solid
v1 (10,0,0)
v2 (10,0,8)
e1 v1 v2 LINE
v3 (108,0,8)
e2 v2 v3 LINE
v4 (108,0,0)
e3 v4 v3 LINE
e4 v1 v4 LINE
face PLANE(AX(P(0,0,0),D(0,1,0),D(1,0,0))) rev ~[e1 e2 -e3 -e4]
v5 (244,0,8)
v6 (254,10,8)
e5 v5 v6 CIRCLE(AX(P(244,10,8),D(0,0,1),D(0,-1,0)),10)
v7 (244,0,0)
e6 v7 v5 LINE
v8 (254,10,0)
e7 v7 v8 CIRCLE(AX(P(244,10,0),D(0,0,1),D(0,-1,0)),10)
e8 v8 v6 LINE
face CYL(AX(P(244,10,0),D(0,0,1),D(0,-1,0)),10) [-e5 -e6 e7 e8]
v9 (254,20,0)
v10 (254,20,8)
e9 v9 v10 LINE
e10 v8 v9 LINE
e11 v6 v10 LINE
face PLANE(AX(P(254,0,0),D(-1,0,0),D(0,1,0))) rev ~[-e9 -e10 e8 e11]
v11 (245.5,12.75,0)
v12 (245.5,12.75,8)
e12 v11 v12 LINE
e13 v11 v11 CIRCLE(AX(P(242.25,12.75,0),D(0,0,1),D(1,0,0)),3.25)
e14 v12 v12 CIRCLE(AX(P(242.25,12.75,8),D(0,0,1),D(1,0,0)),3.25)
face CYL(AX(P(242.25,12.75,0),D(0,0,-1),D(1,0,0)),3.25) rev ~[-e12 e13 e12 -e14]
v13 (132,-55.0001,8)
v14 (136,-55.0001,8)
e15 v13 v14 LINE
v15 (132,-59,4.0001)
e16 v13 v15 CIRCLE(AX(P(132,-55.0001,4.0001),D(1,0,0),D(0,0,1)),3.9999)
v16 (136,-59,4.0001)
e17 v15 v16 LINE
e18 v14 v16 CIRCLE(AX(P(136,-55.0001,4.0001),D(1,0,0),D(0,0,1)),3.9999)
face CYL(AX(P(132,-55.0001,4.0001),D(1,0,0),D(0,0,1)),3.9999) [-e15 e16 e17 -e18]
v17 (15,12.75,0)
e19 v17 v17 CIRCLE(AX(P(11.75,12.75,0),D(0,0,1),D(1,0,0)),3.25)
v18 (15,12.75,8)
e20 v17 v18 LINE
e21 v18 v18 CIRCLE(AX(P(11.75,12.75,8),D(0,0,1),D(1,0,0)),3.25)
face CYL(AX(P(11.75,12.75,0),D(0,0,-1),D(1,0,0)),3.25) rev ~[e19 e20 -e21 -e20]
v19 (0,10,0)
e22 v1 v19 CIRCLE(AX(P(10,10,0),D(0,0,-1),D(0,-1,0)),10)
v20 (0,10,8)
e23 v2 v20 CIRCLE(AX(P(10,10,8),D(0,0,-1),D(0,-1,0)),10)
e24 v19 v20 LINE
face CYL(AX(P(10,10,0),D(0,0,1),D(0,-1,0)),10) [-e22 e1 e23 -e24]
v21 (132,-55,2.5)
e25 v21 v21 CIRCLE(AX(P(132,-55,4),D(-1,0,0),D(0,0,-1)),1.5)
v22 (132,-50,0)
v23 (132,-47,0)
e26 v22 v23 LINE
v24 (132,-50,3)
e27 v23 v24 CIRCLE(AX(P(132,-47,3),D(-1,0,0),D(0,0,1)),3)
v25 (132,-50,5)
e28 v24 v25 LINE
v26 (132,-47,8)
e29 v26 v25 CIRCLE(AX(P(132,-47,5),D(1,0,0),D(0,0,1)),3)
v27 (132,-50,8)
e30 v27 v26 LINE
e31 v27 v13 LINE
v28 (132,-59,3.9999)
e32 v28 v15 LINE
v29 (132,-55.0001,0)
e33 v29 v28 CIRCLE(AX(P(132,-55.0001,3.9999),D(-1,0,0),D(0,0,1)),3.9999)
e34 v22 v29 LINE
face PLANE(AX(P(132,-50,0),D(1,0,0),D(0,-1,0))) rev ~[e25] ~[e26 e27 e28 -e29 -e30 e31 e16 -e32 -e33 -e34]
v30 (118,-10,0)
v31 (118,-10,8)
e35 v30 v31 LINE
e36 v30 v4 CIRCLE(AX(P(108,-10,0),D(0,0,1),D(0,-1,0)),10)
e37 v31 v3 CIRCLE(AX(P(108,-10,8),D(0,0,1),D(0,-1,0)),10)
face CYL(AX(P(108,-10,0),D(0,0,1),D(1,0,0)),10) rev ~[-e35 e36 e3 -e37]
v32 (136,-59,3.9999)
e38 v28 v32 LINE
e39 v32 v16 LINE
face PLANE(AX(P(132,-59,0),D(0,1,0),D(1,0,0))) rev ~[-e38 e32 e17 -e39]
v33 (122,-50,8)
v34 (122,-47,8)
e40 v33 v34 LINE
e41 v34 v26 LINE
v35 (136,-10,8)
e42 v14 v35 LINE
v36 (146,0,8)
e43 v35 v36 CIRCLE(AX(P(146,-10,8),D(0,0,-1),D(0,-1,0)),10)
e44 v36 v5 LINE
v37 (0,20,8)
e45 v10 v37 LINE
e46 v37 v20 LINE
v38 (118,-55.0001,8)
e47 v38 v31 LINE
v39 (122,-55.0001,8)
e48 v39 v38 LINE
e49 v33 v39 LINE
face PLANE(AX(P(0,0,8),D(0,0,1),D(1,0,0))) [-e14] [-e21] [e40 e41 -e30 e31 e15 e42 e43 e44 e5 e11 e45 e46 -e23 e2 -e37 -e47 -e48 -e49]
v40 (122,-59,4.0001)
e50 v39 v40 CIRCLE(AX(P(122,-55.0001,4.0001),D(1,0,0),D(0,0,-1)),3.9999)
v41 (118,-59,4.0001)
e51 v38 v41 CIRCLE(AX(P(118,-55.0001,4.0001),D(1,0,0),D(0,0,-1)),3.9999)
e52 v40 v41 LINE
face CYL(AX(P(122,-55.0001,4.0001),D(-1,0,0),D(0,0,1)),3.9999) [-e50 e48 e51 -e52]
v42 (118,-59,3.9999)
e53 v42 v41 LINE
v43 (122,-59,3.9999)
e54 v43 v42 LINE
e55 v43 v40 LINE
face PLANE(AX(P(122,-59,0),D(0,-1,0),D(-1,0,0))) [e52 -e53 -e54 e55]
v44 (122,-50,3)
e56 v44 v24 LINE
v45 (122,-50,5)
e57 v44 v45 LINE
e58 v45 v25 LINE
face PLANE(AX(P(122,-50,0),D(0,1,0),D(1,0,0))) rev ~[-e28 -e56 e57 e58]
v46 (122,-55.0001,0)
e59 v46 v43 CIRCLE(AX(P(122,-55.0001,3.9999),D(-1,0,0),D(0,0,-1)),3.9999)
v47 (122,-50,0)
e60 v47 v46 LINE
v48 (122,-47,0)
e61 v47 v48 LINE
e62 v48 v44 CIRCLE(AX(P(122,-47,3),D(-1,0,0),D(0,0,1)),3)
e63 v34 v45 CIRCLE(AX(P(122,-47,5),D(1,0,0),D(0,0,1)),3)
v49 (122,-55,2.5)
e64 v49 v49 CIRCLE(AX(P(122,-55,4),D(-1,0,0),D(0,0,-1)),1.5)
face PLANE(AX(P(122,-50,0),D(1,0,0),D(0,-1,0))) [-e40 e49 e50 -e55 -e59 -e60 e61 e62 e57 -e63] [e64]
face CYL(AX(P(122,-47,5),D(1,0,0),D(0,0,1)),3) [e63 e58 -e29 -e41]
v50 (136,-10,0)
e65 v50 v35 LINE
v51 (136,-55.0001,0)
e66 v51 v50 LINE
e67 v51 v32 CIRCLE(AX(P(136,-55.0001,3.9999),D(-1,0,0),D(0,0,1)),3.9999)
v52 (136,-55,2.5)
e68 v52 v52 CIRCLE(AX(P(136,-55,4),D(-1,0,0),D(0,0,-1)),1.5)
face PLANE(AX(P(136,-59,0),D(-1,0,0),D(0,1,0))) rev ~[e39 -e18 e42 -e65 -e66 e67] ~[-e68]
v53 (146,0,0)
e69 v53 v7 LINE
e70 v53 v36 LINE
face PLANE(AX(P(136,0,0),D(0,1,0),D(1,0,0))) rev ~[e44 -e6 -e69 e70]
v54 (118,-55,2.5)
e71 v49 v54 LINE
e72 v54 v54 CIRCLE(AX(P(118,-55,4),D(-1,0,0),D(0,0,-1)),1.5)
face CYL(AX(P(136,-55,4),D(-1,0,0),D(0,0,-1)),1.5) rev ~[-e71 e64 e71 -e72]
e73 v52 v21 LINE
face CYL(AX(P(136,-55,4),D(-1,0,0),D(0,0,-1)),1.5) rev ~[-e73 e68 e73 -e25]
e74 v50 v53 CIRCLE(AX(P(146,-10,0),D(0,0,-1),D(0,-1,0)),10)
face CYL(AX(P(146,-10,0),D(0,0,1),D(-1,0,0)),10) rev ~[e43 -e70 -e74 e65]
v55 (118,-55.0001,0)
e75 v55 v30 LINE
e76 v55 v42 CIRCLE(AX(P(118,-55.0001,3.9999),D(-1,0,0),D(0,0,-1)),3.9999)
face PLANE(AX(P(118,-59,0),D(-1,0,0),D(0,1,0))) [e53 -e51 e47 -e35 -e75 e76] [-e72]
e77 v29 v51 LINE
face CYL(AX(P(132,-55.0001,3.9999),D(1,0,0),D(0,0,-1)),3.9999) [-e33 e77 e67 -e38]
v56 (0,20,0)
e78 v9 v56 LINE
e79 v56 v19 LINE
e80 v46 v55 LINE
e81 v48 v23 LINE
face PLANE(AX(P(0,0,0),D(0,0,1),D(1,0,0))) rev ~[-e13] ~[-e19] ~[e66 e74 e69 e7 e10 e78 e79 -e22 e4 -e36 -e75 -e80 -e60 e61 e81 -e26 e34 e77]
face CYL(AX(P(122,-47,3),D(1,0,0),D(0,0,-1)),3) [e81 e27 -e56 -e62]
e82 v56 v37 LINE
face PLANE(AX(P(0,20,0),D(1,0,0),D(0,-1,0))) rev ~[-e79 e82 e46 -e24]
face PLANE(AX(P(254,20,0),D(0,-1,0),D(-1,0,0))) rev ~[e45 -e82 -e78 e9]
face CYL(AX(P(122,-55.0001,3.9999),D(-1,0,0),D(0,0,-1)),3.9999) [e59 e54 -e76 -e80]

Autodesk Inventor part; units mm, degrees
ref_plane "YZ Plane" through (0, 0, 0) normal (1, 0, 0) x (0, 1, 0)
ref_plane "XZ Plane" through (0, 0, 0) normal (0, 1, 0) x (-1, 0, 0)
ref_plane "XY Plane" through (0, 0, 0) normal (0, 0, 1) x (1, 0, 0)
sketch "Sketch1" plane through (0, 0, 0) normal (0, 0, 1) x (1, 0, 0)
  line L0 (254, 0) -> (254, 20)
  line L1 (254, 20) -> (0, 20)
  line L2 (0, 20) -> (0, 0)
  line L3 (0, 20) -> (0, 16) construction
  line L4 (0, 16) -> (8.5, 16) construction
  line L5 (8.5, 16) -> (11.75, 16) construction
  line L6 (11.75, 16) -> (11.75, 12.75) construction
  circle A0 centre (11.75, 12.75) radius 3.25
  line L7 (254, 20) -> (254, 16) construction
  line L8 (254, 16) -> (245.5, 16) construction
  line L9 (245.5, 16) -> (245.5, 12.75) construction
  line L10 (245.5, 12.75) -> (242.25, 12.75) construction
  circle A1 centre (242.25, 12.75) radius 3.25
  line L11 (0, 0) -> (254, 0)
  line L12 (127, 0) -> (127, -50) construction
  line L13 (122, -50) -> (132, -50)
  line L14 (132, -50) -> (132, -59)
  line L15 (122, -50) -> (122, -59)
  line L16 (132, -59) -> (136, -59)
  line L17 (122, -59) -> (118, -59)
  line L18 (118, -59) -> (118, 0)
  line L19 (136, -59) -> (136, 0)
  dimension "d1" = 20
  dimension "d2" = 4
  dimension "d3" = 8.5
  dimension "d4" = 3.25
  dimension "d5" = 3.25
  dimension "d6" = 4
  dimension "d7" = 8.5
  dimension "d8" = 3.25
  dimension "d9" = 3.25
  dimension "d14" = 242.25
  dimension "d40" = 50
  dimension "d41" = 10
  dimension "d42" = 5
  dimension "d43" = 0
  dimension "d44" = 9
  dimension "d45" = 9
  dimension "d46" = 4
  dimension "d47" = 4
extrude "Extrusion1" add sketch "Sketch1" along normal blind 8
fillet "Fillet2" radius 4 4 edges at (120, -59, 8) (120, -59, 0) (134, -59, 0) (134, -59, 8)
hole "Hole1" at (136, -55, 4) direction (-1, 0, 0) diameter 3 end through all
fillet "Fillet5" radius 10 4 edges at (0, 0, 4) (118, 0, 4) (136, 0, 4) (254, 0, 4)
fillet "Fillet6" radius 3 2 edges at (127, -50, 8) (127, -50, 0)
equation "\"d42\" = 0.5 * d41"
equation "\"d45\" = d44"
equation "\"d47\" = d46"
properties part number "WebcamBase"
